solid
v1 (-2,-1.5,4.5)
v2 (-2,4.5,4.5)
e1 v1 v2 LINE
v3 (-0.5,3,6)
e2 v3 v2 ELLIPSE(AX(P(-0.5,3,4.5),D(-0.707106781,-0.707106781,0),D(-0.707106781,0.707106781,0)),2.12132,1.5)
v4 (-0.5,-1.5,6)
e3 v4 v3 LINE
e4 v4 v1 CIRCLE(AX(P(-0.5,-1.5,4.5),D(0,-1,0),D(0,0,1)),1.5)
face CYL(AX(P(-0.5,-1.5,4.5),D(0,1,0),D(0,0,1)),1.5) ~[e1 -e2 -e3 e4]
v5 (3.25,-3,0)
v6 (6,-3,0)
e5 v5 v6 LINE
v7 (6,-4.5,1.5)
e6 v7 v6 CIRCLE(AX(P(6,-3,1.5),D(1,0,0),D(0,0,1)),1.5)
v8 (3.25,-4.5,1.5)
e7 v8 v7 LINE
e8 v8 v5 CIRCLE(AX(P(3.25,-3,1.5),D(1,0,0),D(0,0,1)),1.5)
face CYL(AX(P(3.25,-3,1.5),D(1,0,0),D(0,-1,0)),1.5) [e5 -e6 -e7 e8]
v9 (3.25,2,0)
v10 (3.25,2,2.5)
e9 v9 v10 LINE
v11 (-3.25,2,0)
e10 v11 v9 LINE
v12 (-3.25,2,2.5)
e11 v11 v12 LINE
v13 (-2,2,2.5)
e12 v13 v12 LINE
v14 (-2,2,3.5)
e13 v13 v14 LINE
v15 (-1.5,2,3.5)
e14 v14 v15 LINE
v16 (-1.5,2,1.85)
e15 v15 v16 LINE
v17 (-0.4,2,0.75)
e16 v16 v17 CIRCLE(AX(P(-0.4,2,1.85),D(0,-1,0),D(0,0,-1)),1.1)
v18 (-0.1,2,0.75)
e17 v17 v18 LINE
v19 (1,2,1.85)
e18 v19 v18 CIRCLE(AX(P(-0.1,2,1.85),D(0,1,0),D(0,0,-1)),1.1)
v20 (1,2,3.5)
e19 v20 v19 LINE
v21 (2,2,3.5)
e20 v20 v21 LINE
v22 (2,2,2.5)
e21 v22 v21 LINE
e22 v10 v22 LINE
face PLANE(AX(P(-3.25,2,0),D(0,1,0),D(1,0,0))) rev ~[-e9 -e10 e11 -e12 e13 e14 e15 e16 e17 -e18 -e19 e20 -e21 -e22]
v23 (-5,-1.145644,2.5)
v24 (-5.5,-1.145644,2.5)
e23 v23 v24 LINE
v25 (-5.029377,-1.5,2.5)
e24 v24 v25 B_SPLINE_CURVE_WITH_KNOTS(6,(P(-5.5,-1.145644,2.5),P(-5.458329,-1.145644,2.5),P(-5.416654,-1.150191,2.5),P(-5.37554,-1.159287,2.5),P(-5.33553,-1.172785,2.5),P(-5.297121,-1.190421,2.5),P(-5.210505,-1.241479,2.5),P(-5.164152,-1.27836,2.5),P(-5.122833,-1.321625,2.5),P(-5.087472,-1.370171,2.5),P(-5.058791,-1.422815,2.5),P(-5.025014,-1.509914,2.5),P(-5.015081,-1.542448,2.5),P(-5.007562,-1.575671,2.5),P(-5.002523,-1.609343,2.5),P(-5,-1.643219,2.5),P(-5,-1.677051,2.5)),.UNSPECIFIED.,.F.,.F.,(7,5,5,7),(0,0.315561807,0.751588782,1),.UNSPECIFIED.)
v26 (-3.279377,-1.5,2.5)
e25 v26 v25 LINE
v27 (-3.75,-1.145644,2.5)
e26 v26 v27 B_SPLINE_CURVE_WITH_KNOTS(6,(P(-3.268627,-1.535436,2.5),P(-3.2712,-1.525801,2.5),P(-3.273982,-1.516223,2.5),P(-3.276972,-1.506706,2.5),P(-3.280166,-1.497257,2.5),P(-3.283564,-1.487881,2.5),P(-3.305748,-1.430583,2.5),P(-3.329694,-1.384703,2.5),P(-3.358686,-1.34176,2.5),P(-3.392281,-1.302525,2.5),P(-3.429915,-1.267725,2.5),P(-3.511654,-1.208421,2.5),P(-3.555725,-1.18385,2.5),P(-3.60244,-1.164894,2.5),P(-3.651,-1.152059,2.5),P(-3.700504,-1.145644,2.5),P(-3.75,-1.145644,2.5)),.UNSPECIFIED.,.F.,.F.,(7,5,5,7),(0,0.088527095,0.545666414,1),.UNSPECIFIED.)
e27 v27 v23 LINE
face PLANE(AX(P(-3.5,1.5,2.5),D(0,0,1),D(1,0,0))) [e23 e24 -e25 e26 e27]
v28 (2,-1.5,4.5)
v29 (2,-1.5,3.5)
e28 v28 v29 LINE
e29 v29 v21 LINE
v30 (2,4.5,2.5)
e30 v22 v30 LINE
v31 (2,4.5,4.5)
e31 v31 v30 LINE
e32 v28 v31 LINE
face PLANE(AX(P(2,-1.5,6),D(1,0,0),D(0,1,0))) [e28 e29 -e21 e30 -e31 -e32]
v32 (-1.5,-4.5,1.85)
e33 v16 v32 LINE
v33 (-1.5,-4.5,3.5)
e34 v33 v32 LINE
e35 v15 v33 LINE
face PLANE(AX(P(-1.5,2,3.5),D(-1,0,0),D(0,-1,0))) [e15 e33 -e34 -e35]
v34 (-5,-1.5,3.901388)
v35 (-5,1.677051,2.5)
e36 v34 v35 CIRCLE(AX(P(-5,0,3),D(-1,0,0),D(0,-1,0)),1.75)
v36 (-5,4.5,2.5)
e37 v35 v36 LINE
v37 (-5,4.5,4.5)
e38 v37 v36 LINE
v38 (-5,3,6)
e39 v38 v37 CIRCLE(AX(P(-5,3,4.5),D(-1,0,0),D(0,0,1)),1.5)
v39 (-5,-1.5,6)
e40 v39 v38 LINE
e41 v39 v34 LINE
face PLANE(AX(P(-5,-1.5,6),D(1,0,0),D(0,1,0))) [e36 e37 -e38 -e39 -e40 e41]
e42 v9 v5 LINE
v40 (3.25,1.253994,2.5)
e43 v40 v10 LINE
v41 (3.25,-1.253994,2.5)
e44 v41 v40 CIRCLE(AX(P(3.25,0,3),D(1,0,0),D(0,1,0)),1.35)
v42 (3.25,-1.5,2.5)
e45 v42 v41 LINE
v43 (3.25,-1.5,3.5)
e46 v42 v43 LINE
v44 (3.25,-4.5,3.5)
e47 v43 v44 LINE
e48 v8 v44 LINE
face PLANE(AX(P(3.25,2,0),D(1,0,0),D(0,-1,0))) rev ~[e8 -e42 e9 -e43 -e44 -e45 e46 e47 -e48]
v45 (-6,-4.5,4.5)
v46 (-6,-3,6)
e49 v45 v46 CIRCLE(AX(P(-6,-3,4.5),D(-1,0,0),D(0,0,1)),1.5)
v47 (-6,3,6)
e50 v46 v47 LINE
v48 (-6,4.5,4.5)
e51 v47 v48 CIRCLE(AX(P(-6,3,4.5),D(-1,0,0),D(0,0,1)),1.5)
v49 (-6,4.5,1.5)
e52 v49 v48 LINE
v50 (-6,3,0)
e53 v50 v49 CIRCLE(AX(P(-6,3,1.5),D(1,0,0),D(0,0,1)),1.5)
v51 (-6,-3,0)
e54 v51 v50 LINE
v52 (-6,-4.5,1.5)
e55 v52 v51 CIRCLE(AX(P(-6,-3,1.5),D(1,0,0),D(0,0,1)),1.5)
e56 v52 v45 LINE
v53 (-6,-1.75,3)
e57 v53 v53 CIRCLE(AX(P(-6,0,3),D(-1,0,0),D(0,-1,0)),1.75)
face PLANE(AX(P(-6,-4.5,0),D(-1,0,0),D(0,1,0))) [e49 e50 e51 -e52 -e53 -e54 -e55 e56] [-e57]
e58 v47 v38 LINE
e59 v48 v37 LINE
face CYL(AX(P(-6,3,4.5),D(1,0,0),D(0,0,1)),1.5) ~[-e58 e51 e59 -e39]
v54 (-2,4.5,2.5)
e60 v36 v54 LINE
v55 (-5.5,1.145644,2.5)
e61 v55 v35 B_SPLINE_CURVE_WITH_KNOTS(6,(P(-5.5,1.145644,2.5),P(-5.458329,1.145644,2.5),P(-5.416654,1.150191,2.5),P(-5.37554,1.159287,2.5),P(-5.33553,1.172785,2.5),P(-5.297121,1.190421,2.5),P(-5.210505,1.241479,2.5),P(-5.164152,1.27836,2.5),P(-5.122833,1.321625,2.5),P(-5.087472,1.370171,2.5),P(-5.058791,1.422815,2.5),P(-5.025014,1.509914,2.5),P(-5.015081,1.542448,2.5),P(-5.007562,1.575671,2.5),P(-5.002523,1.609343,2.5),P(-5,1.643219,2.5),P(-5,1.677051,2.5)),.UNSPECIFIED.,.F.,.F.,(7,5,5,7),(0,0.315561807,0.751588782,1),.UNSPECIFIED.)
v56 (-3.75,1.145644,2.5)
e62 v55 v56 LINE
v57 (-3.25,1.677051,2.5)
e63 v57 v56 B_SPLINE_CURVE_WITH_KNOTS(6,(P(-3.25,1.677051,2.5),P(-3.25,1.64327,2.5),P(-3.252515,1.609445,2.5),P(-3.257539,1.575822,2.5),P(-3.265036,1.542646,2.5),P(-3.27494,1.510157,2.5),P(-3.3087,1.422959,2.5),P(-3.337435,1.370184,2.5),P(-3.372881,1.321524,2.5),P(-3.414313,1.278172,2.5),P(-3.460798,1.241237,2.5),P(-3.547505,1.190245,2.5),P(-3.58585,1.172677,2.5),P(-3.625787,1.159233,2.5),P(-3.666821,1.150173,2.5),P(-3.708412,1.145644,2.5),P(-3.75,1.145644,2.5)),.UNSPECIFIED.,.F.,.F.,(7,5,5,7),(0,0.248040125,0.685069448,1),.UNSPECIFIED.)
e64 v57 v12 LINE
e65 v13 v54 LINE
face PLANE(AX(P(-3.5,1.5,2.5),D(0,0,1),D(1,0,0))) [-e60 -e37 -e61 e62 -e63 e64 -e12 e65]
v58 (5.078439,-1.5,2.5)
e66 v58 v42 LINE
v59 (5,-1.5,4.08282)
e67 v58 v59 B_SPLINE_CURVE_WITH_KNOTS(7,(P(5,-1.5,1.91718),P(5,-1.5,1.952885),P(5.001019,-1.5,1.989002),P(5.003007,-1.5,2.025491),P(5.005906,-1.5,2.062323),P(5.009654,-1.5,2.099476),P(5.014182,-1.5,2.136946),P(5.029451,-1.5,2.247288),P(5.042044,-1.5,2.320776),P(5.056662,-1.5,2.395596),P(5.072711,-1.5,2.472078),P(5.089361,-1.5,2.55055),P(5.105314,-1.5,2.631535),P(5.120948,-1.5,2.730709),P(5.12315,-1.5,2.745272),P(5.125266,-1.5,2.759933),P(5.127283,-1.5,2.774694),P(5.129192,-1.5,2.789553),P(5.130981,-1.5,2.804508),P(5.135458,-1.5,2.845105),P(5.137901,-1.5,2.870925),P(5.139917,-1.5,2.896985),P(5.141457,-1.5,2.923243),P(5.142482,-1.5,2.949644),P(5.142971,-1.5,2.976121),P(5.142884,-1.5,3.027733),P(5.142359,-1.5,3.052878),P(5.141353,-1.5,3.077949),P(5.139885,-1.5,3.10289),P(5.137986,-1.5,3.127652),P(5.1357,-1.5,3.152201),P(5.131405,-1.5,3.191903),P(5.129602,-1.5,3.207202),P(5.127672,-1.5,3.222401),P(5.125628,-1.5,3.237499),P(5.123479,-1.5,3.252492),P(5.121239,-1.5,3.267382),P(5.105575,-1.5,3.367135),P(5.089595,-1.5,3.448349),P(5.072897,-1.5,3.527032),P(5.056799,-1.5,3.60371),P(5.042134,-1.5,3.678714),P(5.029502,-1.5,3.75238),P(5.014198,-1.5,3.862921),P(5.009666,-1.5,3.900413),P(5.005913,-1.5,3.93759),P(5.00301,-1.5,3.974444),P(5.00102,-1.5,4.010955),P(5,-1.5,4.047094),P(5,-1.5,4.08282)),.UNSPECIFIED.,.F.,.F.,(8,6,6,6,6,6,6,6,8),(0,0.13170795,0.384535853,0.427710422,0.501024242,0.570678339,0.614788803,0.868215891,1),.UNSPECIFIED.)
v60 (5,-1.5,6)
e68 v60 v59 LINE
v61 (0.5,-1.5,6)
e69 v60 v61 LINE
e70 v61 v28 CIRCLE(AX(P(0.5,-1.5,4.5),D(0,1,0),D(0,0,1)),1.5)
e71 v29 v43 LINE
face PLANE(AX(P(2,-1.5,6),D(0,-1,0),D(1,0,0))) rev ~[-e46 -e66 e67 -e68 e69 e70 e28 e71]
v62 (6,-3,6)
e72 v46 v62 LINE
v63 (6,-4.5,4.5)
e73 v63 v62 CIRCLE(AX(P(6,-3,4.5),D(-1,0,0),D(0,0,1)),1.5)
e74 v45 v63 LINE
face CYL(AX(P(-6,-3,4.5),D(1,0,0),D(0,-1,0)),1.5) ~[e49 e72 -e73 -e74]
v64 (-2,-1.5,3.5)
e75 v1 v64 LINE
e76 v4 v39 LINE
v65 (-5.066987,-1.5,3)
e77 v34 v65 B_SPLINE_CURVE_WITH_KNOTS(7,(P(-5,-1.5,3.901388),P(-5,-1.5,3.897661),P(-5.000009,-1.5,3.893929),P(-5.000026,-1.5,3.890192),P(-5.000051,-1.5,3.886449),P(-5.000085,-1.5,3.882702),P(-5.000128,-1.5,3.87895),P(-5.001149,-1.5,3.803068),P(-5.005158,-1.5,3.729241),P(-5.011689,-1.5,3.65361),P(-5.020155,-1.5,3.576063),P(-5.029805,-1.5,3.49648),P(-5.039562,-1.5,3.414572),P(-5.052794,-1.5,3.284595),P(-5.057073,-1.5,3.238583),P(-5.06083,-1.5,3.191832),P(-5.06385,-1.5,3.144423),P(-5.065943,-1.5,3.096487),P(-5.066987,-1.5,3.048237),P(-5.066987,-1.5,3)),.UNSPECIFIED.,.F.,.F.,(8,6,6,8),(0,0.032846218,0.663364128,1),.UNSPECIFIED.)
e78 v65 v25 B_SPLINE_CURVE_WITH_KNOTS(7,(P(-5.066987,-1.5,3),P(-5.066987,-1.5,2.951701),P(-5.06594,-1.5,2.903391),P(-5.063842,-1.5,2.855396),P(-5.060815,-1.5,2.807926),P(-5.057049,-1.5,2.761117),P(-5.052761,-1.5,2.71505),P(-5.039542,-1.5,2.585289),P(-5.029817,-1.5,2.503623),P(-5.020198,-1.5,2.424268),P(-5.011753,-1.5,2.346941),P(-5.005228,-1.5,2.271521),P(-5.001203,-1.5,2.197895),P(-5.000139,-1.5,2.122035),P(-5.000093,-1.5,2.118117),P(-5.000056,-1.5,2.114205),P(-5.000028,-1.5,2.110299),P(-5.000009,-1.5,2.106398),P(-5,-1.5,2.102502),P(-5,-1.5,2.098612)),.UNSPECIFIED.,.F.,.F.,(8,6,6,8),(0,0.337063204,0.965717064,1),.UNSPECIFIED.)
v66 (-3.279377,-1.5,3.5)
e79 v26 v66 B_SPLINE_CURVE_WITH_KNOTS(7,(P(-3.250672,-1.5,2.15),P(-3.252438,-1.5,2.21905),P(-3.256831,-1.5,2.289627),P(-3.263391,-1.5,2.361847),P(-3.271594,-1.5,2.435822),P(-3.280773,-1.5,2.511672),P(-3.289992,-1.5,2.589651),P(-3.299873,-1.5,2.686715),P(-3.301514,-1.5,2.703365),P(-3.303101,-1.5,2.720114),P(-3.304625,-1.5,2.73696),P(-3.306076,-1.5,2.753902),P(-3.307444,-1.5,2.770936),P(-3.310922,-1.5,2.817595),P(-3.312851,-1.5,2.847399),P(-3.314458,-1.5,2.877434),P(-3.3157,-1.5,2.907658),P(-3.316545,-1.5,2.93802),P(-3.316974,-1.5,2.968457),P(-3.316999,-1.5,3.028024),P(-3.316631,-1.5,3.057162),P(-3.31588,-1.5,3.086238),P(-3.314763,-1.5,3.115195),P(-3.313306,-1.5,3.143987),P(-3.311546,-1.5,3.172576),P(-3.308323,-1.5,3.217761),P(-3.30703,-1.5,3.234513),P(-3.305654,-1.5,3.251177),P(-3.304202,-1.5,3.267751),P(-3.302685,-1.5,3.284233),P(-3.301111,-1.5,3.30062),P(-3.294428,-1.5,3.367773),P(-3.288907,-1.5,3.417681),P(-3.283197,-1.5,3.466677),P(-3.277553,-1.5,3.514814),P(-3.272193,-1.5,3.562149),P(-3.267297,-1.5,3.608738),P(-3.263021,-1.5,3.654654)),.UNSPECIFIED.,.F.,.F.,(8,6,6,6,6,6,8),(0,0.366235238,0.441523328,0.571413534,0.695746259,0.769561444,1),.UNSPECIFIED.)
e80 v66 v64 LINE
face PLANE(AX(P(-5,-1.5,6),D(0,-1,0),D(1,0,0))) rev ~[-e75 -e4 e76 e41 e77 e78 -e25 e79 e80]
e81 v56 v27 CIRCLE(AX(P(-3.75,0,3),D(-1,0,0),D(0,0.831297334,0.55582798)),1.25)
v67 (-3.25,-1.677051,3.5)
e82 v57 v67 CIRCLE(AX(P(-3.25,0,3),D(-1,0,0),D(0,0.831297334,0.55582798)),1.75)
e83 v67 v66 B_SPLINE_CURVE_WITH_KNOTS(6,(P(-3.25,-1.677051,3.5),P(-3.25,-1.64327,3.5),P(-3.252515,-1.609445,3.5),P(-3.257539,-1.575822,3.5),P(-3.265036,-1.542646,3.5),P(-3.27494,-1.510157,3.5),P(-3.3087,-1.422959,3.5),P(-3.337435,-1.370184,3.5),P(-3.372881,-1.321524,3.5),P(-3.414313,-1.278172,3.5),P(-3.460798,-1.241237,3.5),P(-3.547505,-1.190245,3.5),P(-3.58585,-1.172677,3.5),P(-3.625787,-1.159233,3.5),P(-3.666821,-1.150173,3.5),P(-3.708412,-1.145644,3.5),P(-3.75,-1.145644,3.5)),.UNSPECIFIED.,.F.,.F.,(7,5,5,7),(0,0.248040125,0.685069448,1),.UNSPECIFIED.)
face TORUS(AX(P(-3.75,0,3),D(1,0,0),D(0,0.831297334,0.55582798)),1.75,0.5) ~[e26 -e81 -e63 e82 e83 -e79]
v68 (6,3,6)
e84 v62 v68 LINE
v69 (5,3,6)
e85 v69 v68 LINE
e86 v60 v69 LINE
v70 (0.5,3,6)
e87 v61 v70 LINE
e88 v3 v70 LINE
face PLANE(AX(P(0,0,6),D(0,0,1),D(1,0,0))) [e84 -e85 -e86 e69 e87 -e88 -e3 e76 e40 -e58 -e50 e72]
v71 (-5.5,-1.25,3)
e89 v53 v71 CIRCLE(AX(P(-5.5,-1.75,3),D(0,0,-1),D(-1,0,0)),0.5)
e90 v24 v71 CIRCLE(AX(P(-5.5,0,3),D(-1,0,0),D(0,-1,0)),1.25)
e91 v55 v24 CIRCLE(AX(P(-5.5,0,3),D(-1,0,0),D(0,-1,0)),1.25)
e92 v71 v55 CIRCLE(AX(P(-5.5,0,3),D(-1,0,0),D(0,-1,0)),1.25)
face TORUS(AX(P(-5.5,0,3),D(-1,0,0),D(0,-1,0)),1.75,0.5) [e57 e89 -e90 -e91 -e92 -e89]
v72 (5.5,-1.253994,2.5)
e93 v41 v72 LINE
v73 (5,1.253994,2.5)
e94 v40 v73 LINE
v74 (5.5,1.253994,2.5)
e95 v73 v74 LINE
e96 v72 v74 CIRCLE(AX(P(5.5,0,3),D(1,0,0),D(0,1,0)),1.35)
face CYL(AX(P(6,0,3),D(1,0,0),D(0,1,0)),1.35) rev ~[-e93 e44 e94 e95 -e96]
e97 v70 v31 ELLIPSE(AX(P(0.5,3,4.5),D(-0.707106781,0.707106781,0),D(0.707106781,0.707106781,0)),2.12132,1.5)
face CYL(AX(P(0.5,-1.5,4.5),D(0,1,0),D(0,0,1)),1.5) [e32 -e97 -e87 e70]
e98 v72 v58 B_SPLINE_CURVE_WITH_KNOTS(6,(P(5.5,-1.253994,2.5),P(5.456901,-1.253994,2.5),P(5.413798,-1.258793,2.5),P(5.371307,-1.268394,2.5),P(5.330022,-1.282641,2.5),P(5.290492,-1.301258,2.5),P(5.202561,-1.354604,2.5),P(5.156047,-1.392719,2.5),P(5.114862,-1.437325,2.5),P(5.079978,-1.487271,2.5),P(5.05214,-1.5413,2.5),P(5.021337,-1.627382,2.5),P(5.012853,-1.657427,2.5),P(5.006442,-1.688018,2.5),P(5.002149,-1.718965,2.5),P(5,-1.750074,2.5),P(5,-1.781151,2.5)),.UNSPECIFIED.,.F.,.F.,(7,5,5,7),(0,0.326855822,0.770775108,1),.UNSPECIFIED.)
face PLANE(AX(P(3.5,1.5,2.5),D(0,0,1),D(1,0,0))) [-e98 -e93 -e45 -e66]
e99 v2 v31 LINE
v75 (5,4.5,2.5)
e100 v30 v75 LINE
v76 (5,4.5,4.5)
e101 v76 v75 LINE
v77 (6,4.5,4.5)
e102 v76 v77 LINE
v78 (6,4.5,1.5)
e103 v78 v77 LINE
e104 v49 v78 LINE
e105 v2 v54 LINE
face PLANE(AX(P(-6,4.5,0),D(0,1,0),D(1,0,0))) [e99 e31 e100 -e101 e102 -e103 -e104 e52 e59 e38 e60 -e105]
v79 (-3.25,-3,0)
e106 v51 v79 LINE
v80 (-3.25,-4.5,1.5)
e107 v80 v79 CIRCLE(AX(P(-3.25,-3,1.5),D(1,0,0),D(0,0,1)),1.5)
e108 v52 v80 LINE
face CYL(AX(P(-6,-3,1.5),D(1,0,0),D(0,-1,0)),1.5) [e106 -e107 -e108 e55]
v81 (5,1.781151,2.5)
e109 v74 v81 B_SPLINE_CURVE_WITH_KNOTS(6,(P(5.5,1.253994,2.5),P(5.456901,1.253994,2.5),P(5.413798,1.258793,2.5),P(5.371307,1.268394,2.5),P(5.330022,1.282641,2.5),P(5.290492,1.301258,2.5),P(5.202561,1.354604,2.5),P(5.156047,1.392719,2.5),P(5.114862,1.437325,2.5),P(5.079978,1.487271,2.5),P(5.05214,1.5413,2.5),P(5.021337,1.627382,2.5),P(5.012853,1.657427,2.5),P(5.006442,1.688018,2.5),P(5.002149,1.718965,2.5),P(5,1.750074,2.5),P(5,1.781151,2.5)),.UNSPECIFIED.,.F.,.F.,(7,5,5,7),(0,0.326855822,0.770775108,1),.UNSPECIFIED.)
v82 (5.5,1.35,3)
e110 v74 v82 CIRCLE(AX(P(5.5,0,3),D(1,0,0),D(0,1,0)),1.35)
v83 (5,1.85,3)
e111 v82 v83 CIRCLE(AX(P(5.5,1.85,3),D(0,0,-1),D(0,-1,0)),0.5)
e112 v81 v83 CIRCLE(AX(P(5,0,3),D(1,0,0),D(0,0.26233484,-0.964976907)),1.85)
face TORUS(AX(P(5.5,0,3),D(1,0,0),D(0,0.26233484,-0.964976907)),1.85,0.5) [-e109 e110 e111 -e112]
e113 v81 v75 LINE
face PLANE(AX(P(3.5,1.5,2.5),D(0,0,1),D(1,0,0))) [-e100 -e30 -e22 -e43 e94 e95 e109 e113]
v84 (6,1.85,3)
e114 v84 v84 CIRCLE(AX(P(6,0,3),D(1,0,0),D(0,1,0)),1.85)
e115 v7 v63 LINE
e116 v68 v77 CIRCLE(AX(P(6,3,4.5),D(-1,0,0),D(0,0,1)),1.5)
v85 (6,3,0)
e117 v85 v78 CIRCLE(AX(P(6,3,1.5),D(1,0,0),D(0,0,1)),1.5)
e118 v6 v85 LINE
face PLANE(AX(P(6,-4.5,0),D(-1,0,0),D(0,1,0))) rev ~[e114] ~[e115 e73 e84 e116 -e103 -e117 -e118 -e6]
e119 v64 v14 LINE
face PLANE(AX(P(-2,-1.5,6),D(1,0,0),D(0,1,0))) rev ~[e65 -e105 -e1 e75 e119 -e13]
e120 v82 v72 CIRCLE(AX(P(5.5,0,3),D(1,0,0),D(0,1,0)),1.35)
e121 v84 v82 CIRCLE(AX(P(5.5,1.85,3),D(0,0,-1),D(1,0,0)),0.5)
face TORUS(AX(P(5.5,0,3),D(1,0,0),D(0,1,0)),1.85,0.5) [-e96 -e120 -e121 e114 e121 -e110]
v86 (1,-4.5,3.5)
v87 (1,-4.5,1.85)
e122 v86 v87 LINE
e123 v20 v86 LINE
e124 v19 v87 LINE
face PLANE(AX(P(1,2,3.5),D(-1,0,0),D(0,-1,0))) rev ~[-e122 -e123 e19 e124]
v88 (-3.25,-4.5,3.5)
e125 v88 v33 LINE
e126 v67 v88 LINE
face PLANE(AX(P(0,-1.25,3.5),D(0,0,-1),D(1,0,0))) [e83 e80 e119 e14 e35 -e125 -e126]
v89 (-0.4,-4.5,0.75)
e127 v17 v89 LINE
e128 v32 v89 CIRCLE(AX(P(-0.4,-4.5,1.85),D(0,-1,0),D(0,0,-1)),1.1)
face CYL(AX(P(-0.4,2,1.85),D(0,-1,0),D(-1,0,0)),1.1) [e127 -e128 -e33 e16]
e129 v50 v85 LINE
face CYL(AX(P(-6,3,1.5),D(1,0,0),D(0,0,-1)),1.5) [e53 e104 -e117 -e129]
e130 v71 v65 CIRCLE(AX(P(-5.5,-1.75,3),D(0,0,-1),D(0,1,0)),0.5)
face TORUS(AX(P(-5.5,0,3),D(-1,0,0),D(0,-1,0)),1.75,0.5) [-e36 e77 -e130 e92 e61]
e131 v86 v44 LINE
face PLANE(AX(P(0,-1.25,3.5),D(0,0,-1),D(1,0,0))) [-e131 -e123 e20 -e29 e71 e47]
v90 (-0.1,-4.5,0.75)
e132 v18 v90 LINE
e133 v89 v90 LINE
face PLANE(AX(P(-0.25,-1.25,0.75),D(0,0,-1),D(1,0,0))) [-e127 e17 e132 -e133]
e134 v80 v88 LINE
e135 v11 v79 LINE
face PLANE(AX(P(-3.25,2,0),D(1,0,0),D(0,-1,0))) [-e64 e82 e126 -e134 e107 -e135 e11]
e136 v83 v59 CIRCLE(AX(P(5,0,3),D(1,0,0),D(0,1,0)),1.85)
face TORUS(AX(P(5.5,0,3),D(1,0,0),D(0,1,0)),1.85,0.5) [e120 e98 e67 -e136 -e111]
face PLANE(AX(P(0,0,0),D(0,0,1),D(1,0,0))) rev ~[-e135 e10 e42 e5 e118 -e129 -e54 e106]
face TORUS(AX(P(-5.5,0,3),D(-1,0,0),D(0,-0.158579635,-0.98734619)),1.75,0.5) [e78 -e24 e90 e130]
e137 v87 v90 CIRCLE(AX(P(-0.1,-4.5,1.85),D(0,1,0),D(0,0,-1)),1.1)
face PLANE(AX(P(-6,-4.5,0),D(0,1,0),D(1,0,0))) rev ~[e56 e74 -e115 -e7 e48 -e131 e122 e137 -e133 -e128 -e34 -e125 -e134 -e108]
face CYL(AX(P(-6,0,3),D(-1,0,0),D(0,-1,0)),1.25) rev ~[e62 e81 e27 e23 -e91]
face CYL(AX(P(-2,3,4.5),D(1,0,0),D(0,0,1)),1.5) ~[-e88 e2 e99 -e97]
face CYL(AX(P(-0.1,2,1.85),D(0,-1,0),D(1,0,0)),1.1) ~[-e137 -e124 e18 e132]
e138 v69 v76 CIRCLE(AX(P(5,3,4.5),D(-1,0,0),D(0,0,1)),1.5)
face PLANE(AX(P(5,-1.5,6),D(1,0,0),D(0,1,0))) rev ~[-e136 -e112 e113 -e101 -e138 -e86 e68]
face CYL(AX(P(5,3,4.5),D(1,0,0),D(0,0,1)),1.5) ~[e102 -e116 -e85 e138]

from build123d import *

# Parameters (mm, degrees)
F0_W          = 12
F0_H          = 9
F1_DEPTH      = 6
F2_W          = 3
F2_H          = 6
F3_DEPTH      = 3.5
F4_W          = 6.5
F4_H          = 6.5
F5_DEPTH      = 3.5
F6_R          = 1.35
F7_DEPTH      = 3
F8_R          = 1.25
F9_DEPTH      = 2.751
F10_R         = 1.5
F11_W         = 2.5
F11_H         = 6.5
F12_DEPTH     = 2.75
F13_R         = 1.1
F14_T8_ANGLE  = 247.5355258221
F14_T13_ANGLE = 74.7913514773
F14_T18_ANGLE = 254.8973081934
F14_T24_ANGLE = 80.8755372564
F14_T30_ANGLE = 260.9918579461


# Not quite as in the source:
# - a fillet or chamfer that OpenCascade refuses, or shapes differently, is made with other operations: its cross-section is extruded or revolved along the edge and cut away or added


with BuildPart() as f1:
    # F0 (on Top) → F1 (new body)
    with BuildSketch(Plane.XY):
        Rectangle(F0_W, F0_H)
    extrude(amount=F1_DEPTH)

    # F2 (on face) → F3 (cut)
    with BuildSketch(Plane.XY.offset(6)):
        with Locations((3.5, 1.5)):
            Rectangle(F2_W, F2_H)
        with Locations((-3.5, 1.5)):
            Rectangle(F2_W, F2_H)
    extrude(amount=-F3_DEPTH, mode=Mode.SUBTRACT)

    # F4 (on face) → F5 (cut)
    with BuildSketch(Plane(origin=(0, 0, 0), x_dir=(1, 0, 0), z_dir=(0, 0, -1))):
        with Locations((0, 1.25)):
            Rectangle(F4_W, F4_H)
    extrude(amount=-F5_DEPTH, mode=Mode.SUBTRACT)

    # F6 (on face) → F7 (cut)
    with BuildSketch(Plane.YZ.offset(6)):
        with Locations((0, 3)):
            Circle(F6_R)
    extrude(amount=-F7_DEPTH, mode=Mode.SUBTRACT)

    # F8 (on face) → F9 (cut, through all)
    with BuildSketch(Plane(origin=(-6, 0, 0), x_dir=(0, -1, 0), z_dir=(-1, 0, 0))):
        with Locations((0, 3)):
            Circle(F8_R)
    extrude(amount=-F9_DEPTH, mode=Mode.SUBTRACT)

    # F10
    f10_edges = [f1.edges().sort_by_distance(p)[0] for p in [
        (2, 1.5, 6),
        (-2, 1.5, 6),
        (0, -4.5, 6),
        (-4.625, -4.5, 0),
        (4.625, -4.5, 0),
        (0, 4.5, 0),
        (-5.5, 4.5, 6),
        (5.5, 4.5, 6),
        (0, 4.5, 6),
    ]]
    fillet(f10_edges, radius=F10_R)

    # F11 (on face) → F12 (join)
    with BuildSketch(Plane(origin=(0, 0, 3.5), x_dir=(1, 0, 0), z_dir=(0, 0, -1))):
        with Locations((-0.25, 1.25)):
            Rectangle(F11_W, F11_H)
    extrude(amount=F12_DEPTH)

    # F13
    f13_edges = [f1.edges().sort_by_distance(p)[0] for p in [
        (-1.5, -1.25, 0.75),
        (1, -1.25, 0.75),
    ]]
    fillet(f13_edges, radius=F13_R)

    # F14: fillet of radius 0.5 on 7 edges, made by hand

    # F14_s1 → F14_t2 (revolve, cut)
    with BuildSketch(Plane.XY.offset(3)):
        with BuildLine():
            ThreePointArc((6, 1.85), (5.8535533906, 1.4964466094), (5.5, 1.35))
            Line((5.5, 1.35), (6, 1.35))
            Line((6, 1.35), (6, 1.85))
        make_face()
    revolve(axis=Axis((6, 0, 3), (1, 0, 0)), mode=Mode.SUBTRACT)

    # F14_s3 → F14_t4 (revolve, cut)
    with BuildSketch(Plane.XY.offset(3)):
        with BuildLine():
            ThreePointArc((-6, -1.75), (-5.8535533906, -1.3964466094), (-5.5, -1.25))
            Line((-5.5, -1.25), (-6, -1.25))
            Line((-6, -1.25), (-6, -1.75))
        make_face()
    revolve(axis=Axis((-6, 0, 3), (-1, 0, 0)), mode=Mode.SUBTRACT)


with BuildPart() as f14_tool6:
    # F14_s7 → F14_t8 (revolve)
    with BuildSketch(Plane(origin=(0, -1.3861749524, 2.0731657713), x_dir=(1, 0, 0), z_dir=(0, -0.5558279796, 0.8312973338))):
        with BuildLine():
            ThreePointArc((-3.25, 3.4174839388), (-3.3964466094, 3.0639305482), (-3.75, 2.9174839388))
            Line((-3.75, 2.9174839388), (-3.25, 2.9174839388))
            Line((-3.25, 2.9174839388), (-3.25, 3.4174839388))
        make_face()
    revolve(axis=Axis((-3.25, 0, 3), (-1, 0, 0)), revolution_arc=F14_T8_ANGLE)

    split(bisect_by=Plane.XY.offset(3.5), keep=Keep.BOTTOM)


with BuildPart() as f1_1:
    add(f1.part)

    # F14_t5: cut F14_tool6
    add(f14_tool6.part, mode=Mode.SUBTRACT)


with BuildPart() as f14_tool11:
    # F14_s12 → F14_t13 (revolve)
    with BuildSketch(Plane(origin=(0, 0.7594411885, 0.2064587052), x_dir=(1, 0, 0), z_dir=(0, -0.9649769073, -0.2623348403))):
        with BuildLine():
            ThreePointArc((5.5, 1.5449307218), (5.1464466094, 1.3984841124), (5, 1.0449307218))
            Line((5, 1.0449307218), (5, 1.5449307218))
            Line((5, 1.5449307218), (5.5, 1.5449307218))
        make_face()
    revolve(axis=Axis((5, 0, 3), (1, 0, 0)), revolution_arc=F14_T13_ANGLE)

    split(bisect_by=Plane.XY.offset(2.5), keep=Keep.TOP)


with BuildPart() as f1_2:
    add(f1_1.part)

    # F14_t10: cut F14_tool11
    add(f14_tool11.part, mode=Mode.SUBTRACT)


with BuildPart() as f14_tool16:
    # F14_s17 → F14_t18 (revolve)
    with BuildSketch(Plane.XY.offset(3)):
        with BuildLine():
            ThreePointArc((5.5, 1.35), (5.1464466094, 1.4964466094), (5, 1.85))
            Line((5, 1.85), (5, 1.35))
            Line((5, 1.35), (5.5, 1.35))
        make_face()
    revolve(axis=Axis((5, 0, 3), (1, 0, 0)), revolution_arc=F14_T18_ANGLE)

    split(bisect_by=Plane.XZ.offset(1.5), keep=Keep.BOTTOM)

    split(bisect_by=Plane.XY.offset(2.5), keep=Keep.TOP)


with BuildPart() as f1_3:
    add(f1_2.part)

    # F14_t15: cut F14_tool16
    add(f14_tool16.part, mode=Mode.SUBTRACT)


with BuildPart() as f14_tool22:
    # F14_s23 → F14_t24 (revolve)
    with BuildSketch(Plane(origin=(0, -0.469718994, 0.0754425014), x_dir=(1, 0, 0), z_dir=(0, 0.9873461903, -0.1585796345))):
        with BuildLine():
            ThreePointArc((-5.5, -1.7120385709), (-5.1464466094, -1.5655919615), (-5, -1.2120385709))
            Line((-5, -1.2120385709), (-5, -1.7120385709))
            Line((-5, -1.7120385709), (-5.5, -1.7120385709))
        make_face()
    revolve(axis=Axis((-5, 0, 3), (-1, 0, 0)), revolution_arc=F14_T24_ANGLE)

    split(bisect_by=Plane.XZ.offset(1.5), keep=Keep.BOTTOM)

    split(bisect_by=Plane.XY.offset(2.5), keep=Keep.TOP)


with BuildPart() as f1_4:
    add(f1_3.part)

    # F14_t21: cut F14_tool22
    add(f14_tool22.part, mode=Mode.SUBTRACT)


with BuildPart() as f14_tool28:
    # F14_s29 → F14_t30 (revolve)
    with BuildSketch(Plane.XY.offset(3)):
        with BuildLine():
            ThreePointArc((-5.5, -1.25), (-5.1464466094, -1.3964466094), (-5, -1.75))
            Line((-5, -1.75), (-5, -1.25))
            Line((-5, -1.25), (-5.5, -1.25))
        make_face()
    revolve(axis=Axis((-5, 0, 3), (-1, 0, 0)), revolution_arc=F14_T30_ANGLE)

    split(bisect_by=Plane.XZ.offset(1.5), keep=Keep.BOTTOM)

    split(bisect_by=Plane.XY.offset(2.5), keep=Keep.TOP)


with BuildPart() as f1_5:
    add(f1_4.part)

    # F14_t27: cut F14_tool28
    add(f14_tool28.part, mode=Mode.SUBTRACT)


solid = f1_5.part
